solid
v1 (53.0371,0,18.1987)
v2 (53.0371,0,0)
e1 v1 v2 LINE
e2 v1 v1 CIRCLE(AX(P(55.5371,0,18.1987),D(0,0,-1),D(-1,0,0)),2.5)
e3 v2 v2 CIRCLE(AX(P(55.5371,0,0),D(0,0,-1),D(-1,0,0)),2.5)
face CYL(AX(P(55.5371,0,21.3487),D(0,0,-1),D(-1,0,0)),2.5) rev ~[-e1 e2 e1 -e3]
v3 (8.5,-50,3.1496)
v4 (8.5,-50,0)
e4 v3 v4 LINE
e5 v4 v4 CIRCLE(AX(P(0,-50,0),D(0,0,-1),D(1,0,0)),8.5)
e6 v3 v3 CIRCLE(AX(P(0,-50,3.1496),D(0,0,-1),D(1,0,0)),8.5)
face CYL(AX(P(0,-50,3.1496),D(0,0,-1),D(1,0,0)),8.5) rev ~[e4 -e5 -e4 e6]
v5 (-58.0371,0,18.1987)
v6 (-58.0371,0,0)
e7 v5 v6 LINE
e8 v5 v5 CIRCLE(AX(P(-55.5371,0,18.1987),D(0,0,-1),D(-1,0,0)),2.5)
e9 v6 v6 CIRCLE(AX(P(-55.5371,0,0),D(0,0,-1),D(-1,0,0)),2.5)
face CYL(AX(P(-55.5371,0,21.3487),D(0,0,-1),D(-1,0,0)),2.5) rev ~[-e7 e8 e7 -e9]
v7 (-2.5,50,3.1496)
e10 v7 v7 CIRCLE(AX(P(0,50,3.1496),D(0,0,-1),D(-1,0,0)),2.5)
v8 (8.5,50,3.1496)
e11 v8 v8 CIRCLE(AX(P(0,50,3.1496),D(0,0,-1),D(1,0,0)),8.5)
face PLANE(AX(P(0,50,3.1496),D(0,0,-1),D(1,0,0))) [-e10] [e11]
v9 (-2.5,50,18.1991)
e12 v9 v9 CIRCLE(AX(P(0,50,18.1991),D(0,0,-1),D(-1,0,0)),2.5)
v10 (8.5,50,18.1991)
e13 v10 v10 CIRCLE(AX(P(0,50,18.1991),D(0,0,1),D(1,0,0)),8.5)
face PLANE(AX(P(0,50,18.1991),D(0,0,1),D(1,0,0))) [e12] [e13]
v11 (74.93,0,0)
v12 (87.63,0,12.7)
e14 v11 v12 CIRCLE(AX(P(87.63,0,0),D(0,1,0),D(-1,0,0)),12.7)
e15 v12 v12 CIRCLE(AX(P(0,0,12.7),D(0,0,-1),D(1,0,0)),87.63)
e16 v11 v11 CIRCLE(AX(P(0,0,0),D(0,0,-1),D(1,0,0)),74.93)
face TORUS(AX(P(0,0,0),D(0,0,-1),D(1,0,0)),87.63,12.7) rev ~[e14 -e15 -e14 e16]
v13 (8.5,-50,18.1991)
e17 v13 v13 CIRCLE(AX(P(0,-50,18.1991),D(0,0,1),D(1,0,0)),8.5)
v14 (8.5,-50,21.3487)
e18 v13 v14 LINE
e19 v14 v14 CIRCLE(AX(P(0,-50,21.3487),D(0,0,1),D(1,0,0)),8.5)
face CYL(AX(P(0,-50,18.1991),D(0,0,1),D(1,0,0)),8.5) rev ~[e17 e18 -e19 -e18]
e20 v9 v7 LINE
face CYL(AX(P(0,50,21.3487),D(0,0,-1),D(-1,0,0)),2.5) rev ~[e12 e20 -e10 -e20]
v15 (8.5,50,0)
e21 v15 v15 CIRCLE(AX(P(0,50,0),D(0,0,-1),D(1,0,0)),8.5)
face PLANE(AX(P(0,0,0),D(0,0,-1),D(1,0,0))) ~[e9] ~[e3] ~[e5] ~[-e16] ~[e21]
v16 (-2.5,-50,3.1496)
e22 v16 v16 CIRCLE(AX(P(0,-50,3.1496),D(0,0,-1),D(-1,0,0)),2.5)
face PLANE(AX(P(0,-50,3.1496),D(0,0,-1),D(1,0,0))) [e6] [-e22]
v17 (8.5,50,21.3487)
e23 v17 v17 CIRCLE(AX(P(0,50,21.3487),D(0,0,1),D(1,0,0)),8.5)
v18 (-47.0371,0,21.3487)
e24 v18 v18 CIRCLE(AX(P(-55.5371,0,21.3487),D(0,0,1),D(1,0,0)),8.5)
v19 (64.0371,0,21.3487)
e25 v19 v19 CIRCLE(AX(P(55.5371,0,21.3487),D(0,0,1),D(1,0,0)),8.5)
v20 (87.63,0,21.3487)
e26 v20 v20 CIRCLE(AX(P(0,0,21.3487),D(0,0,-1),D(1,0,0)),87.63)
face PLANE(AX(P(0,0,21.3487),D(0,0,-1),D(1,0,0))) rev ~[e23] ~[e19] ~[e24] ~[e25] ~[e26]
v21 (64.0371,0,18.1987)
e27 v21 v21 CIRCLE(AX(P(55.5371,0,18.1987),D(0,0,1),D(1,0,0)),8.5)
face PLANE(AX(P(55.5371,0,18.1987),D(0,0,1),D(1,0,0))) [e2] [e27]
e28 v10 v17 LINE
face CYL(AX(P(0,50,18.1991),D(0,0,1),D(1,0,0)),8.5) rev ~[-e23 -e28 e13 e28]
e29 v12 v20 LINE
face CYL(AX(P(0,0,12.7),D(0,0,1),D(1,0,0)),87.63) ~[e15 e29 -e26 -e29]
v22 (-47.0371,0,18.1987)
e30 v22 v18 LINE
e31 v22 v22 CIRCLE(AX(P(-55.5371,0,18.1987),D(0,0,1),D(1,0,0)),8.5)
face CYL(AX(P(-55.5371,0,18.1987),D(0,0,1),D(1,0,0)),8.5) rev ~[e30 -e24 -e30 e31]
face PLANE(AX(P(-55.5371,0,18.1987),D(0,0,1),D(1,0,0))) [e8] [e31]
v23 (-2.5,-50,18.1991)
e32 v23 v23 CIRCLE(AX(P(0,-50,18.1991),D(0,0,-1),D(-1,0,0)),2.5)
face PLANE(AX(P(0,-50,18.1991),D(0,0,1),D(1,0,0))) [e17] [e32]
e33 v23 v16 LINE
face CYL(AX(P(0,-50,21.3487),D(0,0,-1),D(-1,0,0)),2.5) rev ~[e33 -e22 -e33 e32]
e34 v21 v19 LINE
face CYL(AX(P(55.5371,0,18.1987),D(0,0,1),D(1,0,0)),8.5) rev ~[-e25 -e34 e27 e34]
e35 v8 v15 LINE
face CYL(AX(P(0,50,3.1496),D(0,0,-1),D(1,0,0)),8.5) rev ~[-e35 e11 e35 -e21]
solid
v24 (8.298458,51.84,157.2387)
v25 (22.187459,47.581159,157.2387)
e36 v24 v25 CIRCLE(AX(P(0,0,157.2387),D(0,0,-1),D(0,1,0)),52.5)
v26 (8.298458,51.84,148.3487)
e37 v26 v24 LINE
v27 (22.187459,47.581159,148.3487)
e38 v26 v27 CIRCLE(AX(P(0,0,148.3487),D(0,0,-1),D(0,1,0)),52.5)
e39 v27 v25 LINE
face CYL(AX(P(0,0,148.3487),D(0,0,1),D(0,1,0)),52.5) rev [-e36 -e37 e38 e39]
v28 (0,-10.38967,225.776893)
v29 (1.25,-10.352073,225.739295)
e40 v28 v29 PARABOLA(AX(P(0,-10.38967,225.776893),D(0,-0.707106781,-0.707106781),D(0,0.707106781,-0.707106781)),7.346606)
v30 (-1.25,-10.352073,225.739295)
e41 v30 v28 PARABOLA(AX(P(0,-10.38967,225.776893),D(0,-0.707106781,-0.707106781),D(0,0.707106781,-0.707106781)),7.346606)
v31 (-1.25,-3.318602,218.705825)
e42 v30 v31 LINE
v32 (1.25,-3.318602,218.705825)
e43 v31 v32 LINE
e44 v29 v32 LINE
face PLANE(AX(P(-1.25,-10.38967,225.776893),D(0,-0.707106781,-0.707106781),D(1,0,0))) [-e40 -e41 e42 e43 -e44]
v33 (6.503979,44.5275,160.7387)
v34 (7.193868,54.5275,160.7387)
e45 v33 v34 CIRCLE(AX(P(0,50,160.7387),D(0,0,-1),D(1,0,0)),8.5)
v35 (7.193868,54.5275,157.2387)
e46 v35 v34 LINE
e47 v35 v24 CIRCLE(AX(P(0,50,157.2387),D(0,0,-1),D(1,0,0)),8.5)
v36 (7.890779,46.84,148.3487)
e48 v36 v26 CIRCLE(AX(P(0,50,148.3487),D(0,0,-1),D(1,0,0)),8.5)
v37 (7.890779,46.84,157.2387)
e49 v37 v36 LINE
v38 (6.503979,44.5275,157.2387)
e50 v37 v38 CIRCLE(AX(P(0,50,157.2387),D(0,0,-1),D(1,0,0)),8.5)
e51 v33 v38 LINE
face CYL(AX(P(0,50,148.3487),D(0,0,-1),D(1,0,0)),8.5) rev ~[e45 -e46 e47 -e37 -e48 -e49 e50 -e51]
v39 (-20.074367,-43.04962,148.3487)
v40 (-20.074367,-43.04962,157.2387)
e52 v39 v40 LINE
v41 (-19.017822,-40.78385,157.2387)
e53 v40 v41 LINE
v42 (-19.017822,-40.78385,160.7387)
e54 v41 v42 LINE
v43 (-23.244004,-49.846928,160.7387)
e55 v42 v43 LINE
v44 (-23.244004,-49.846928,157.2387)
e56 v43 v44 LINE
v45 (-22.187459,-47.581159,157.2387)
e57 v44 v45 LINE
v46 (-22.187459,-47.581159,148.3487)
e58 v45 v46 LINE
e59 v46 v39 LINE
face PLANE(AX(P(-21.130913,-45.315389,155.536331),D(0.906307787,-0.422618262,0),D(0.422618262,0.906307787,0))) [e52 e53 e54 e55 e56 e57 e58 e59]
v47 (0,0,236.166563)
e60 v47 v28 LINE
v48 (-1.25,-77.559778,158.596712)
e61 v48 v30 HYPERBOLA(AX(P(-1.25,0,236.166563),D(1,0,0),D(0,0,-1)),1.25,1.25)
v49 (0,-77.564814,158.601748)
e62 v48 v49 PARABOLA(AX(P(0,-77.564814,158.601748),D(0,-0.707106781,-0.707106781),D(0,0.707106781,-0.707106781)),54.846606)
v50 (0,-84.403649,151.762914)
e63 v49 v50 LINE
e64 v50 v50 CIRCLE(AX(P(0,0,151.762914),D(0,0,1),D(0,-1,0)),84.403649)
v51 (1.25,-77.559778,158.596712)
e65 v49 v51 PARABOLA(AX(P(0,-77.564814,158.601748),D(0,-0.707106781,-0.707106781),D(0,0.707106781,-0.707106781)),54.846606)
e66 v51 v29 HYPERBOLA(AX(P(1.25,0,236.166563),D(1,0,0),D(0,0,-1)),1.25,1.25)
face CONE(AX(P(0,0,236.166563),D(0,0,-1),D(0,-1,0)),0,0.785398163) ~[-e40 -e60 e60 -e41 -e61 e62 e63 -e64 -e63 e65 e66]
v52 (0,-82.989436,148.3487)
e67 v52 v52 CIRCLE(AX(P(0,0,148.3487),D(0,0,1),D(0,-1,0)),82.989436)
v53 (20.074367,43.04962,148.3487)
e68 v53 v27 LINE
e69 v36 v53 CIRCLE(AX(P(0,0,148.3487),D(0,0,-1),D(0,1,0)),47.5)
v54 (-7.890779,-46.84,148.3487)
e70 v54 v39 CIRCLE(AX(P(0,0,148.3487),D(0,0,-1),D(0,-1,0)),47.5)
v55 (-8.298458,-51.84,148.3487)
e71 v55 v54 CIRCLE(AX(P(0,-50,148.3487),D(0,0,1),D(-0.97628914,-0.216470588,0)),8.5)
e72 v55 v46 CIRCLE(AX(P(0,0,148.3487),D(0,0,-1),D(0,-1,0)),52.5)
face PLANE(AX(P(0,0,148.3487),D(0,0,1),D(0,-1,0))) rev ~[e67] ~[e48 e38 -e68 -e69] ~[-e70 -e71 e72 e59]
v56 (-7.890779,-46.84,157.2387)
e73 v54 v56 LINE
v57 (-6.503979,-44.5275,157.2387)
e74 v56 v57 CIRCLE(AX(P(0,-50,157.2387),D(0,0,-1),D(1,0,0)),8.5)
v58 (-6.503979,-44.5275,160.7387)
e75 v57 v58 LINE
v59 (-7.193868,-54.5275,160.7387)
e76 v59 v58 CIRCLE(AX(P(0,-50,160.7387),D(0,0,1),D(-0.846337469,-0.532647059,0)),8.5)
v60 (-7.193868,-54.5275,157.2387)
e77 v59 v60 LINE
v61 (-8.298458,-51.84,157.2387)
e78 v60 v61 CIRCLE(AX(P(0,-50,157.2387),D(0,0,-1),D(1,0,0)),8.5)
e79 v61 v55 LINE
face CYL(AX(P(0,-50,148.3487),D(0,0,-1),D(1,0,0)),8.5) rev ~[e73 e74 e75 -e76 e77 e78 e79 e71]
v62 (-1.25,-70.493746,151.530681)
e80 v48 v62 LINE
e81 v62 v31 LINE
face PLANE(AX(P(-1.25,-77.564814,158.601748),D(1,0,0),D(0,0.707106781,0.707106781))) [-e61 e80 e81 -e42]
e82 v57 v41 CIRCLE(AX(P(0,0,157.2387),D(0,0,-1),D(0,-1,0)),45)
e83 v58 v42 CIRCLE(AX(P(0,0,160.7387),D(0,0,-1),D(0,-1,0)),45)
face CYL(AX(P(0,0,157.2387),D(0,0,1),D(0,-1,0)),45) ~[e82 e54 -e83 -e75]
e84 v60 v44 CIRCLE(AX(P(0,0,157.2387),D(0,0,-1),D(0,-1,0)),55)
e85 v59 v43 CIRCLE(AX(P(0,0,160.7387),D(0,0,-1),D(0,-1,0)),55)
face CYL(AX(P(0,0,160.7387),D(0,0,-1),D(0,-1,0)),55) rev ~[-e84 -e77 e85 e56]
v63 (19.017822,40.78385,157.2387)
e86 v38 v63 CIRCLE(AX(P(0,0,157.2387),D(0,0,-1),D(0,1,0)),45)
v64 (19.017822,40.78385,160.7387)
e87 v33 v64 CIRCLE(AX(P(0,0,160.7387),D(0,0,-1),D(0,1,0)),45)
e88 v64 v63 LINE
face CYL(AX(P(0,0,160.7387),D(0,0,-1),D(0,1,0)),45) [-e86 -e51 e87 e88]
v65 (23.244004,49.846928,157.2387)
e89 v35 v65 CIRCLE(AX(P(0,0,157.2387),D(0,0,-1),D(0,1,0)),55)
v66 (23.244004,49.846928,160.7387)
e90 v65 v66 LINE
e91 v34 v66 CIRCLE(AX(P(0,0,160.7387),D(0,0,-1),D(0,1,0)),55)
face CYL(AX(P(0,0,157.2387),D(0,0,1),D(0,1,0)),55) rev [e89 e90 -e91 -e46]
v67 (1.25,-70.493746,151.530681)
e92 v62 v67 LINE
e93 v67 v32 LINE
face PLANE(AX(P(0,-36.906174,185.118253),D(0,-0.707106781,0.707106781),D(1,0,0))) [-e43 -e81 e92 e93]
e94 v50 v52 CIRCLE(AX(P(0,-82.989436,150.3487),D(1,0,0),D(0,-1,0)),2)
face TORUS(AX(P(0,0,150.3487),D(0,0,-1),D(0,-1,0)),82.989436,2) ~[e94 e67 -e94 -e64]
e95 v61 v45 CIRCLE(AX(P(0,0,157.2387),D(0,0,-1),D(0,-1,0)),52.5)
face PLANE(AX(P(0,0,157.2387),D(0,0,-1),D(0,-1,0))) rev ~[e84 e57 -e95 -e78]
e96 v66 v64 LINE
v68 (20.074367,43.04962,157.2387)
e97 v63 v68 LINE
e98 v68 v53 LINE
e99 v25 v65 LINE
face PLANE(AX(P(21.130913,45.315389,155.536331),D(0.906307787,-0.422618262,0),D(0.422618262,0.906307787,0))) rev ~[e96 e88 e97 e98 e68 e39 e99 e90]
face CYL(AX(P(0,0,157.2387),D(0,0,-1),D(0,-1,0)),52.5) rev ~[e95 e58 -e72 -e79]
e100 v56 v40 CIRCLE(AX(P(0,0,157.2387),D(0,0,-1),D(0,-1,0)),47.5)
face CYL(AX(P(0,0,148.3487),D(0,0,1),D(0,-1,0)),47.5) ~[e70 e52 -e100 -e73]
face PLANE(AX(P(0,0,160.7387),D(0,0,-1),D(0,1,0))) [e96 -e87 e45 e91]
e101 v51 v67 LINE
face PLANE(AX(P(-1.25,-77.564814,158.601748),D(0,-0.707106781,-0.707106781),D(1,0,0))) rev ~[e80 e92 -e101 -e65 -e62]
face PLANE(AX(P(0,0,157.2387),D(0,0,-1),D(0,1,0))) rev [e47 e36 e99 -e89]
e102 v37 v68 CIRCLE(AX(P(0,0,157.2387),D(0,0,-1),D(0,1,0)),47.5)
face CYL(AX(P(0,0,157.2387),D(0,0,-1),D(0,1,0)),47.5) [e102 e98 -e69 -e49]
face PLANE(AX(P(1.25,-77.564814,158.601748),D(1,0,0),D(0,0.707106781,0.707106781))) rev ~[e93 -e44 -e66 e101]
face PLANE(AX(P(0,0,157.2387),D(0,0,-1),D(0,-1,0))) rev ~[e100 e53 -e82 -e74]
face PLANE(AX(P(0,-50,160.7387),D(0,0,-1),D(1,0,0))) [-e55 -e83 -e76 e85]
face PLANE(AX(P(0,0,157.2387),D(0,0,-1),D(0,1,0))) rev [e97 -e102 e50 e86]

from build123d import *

# Parameters (mm, degrees)
F3_D           = 5
F3_CBORE_D     = 17
F3_CBORE_DEPTH = 3.15
F5_D           = 5
F5_CBORE_D     = 17
F5_CBORE_DEPTH = 3.1496
F7_D           = 4
F7_DEPTH       = 3.1496
F7_CBORE_D     = 17
F7_CBORE_DEPTH = 3.1496
F7_TIP         = 1.2017212381
F12_ANGLE      = 25
F14_R          = 8.5
F15_DEPTH      = 12.39
F16_R          = 2
F18_W          = 2.5
F18_H          = 95
F19_DEPTH      = 10


with BuildPart() as f1:
    # F0 (on Front) → F1 (revolve)
    with BuildSketch(Plane.XZ):
        with BuildLine():
            Line((0, 21.3487), (0, 0))
            Line((0, 0), (74.93, 0))
            ThreePointArc((74.93, 0), (78.6497438789, 8.9802561211), (87.63, 12.7))
            Line((87.63, 12.7), (87.63, 21.3487))
            Line((87.63, 21.3487), (0, 21.3487))
        make_face()
    revolve(axis=Axis((0, 0, 10.67435), (0, 0, -1)))

    # F3 (through all)
    with Locations(Plane.XY.offset(21.3487)):
        with Locations((-55.5371, 0), (55.5371, 0)):
            CounterBoreHole(F3_D / 2, F3_CBORE_D / 2, F3_CBORE_DEPTH)

    # F5 (through all)
    with Locations(Plane.XY.offset(21.3487)):
        with Locations((0, 50), (0, -50)):
            CounterBoreHole(F5_D / 2, F5_CBORE_D / 2, F5_CBORE_DEPTH)

    # F7
    with Locations(Plane(origin=(0, 0, 0), x_dir=(1, 0, 0), z_dir=(0, 0, -1))):
        with Locations((0, 50), (0, -50)):
            CounterBoreHole(F7_D / 2, F7_CBORE_D / 2, F7_CBORE_DEPTH, depth=F7_DEPTH)
            with Locations((0, 0, -(F7_DEPTH + F7_TIP / 2))):  # 118° drill point
                Cone(0, F7_D / 2, F7_TIP, mode=Mode.SUBTRACT)


with BuildPart() as f11:
    # F10 (on Right) → F11 (revolve)
    with BuildSketch(Plane.YZ):
        Polygon((-52.5, 157.2387), (-52.5, 148.3487), (-47.5, 148.3487), (-47.5, 157.2387), (-45, 157.2387), (-45, 160.7387), (-50, 160.7387), (-55, 160.7387), (-55, 157.2387), align=None)
        Polygon((-87.8178626299, 148.3487), (-52.5, 148.3487), (-52.5, 157.2387), (-55, 157.2387), (-55, 160.7387), (-50, 160.7387), (-45, 160.7387), (-45, 157.2387), (-47.5, 157.2387), (-47.5, 148.3487), (0, 148.3487), (0, 236.1665626299), align=None)
    revolve(axis=Axis((0, 0, 192.2576313149), (0, 0, 1)))


with BuildPart() as f12:
    # F10 (on Right) → F12 (revolve)
    with BuildSketch(Plane.YZ):
        Polygon((-52.5, 157.2387), (-52.5, 148.3487), (-47.5, 148.3487), (-47.5, 157.2387), (-45, 157.2387), (-45, 160.7387), (-50, 160.7387), (-55, 160.7387), (-55, 157.2387), align=None)
    revolve(axis=Axis((0, 0, 192.2576313149), (0, 0, -1)), revolution_arc=F12_ANGLE)


with BuildPart() as f12b:
    # F10 (on Right) → F12, piece 2 (revolve)
    with BuildSketch(Plane.YZ):
        Polygon((55, 160.7387), (50, 160.7387), (45, 160.7387), (45, 157.2387), (47.5, 157.2387), (47.5, 148.3487), (52.5, 148.3487), (52.5, 157.2387), (55, 157.2387), align=None)
    revolve(axis=Axis((0, 0, 192.2576313149), (0, 0, -1)), revolution_arc=F12_ANGLE)


with BuildPart() as f11_1:
    add(f11.part)

    # F13: cut F12, F12b
    add(f12.part, mode=Mode.SUBTRACT)
    add(f12b.part, mode=Mode.SUBTRACT)

    # F14 (on face) → F15 (cut, through all)
    with BuildSketch(Plane(origin=(0, 0, 148.3487), x_dir=(1, 0, 0), z_dir=(0, 0, -1))):
        with Locations((0, -50)):
            Circle(F14_R)
        with Locations((0, 50)):
            Circle(F14_R)
    extrude(amount=-F15_DEPTH, mode=Mode.SUBTRACT)

    # F16
    f16_edges = [f11_1.edges().sort_by_distance(p)[0] for p in [
        (0, 87.817863, 148.3487),
    ]]
    fillet(f16_edges, radius=F16_R)

    # F18 (on face) → F19 (cut)
    with BuildSketch(Plane(origin=(0, -118.0832813149, 118.0832813149), x_dir=(1, 0, 0), z_dir=(0, -0.7071067812, 0.7071067812))):
        with Locations((0, 104.8017655753)):
            Rectangle(F18_W, F18_H)
    extrude(amount=-F19_DEPTH, mode=Mode.SUBTRACT)


solid = Compound([f1.part, f11_1.part])
